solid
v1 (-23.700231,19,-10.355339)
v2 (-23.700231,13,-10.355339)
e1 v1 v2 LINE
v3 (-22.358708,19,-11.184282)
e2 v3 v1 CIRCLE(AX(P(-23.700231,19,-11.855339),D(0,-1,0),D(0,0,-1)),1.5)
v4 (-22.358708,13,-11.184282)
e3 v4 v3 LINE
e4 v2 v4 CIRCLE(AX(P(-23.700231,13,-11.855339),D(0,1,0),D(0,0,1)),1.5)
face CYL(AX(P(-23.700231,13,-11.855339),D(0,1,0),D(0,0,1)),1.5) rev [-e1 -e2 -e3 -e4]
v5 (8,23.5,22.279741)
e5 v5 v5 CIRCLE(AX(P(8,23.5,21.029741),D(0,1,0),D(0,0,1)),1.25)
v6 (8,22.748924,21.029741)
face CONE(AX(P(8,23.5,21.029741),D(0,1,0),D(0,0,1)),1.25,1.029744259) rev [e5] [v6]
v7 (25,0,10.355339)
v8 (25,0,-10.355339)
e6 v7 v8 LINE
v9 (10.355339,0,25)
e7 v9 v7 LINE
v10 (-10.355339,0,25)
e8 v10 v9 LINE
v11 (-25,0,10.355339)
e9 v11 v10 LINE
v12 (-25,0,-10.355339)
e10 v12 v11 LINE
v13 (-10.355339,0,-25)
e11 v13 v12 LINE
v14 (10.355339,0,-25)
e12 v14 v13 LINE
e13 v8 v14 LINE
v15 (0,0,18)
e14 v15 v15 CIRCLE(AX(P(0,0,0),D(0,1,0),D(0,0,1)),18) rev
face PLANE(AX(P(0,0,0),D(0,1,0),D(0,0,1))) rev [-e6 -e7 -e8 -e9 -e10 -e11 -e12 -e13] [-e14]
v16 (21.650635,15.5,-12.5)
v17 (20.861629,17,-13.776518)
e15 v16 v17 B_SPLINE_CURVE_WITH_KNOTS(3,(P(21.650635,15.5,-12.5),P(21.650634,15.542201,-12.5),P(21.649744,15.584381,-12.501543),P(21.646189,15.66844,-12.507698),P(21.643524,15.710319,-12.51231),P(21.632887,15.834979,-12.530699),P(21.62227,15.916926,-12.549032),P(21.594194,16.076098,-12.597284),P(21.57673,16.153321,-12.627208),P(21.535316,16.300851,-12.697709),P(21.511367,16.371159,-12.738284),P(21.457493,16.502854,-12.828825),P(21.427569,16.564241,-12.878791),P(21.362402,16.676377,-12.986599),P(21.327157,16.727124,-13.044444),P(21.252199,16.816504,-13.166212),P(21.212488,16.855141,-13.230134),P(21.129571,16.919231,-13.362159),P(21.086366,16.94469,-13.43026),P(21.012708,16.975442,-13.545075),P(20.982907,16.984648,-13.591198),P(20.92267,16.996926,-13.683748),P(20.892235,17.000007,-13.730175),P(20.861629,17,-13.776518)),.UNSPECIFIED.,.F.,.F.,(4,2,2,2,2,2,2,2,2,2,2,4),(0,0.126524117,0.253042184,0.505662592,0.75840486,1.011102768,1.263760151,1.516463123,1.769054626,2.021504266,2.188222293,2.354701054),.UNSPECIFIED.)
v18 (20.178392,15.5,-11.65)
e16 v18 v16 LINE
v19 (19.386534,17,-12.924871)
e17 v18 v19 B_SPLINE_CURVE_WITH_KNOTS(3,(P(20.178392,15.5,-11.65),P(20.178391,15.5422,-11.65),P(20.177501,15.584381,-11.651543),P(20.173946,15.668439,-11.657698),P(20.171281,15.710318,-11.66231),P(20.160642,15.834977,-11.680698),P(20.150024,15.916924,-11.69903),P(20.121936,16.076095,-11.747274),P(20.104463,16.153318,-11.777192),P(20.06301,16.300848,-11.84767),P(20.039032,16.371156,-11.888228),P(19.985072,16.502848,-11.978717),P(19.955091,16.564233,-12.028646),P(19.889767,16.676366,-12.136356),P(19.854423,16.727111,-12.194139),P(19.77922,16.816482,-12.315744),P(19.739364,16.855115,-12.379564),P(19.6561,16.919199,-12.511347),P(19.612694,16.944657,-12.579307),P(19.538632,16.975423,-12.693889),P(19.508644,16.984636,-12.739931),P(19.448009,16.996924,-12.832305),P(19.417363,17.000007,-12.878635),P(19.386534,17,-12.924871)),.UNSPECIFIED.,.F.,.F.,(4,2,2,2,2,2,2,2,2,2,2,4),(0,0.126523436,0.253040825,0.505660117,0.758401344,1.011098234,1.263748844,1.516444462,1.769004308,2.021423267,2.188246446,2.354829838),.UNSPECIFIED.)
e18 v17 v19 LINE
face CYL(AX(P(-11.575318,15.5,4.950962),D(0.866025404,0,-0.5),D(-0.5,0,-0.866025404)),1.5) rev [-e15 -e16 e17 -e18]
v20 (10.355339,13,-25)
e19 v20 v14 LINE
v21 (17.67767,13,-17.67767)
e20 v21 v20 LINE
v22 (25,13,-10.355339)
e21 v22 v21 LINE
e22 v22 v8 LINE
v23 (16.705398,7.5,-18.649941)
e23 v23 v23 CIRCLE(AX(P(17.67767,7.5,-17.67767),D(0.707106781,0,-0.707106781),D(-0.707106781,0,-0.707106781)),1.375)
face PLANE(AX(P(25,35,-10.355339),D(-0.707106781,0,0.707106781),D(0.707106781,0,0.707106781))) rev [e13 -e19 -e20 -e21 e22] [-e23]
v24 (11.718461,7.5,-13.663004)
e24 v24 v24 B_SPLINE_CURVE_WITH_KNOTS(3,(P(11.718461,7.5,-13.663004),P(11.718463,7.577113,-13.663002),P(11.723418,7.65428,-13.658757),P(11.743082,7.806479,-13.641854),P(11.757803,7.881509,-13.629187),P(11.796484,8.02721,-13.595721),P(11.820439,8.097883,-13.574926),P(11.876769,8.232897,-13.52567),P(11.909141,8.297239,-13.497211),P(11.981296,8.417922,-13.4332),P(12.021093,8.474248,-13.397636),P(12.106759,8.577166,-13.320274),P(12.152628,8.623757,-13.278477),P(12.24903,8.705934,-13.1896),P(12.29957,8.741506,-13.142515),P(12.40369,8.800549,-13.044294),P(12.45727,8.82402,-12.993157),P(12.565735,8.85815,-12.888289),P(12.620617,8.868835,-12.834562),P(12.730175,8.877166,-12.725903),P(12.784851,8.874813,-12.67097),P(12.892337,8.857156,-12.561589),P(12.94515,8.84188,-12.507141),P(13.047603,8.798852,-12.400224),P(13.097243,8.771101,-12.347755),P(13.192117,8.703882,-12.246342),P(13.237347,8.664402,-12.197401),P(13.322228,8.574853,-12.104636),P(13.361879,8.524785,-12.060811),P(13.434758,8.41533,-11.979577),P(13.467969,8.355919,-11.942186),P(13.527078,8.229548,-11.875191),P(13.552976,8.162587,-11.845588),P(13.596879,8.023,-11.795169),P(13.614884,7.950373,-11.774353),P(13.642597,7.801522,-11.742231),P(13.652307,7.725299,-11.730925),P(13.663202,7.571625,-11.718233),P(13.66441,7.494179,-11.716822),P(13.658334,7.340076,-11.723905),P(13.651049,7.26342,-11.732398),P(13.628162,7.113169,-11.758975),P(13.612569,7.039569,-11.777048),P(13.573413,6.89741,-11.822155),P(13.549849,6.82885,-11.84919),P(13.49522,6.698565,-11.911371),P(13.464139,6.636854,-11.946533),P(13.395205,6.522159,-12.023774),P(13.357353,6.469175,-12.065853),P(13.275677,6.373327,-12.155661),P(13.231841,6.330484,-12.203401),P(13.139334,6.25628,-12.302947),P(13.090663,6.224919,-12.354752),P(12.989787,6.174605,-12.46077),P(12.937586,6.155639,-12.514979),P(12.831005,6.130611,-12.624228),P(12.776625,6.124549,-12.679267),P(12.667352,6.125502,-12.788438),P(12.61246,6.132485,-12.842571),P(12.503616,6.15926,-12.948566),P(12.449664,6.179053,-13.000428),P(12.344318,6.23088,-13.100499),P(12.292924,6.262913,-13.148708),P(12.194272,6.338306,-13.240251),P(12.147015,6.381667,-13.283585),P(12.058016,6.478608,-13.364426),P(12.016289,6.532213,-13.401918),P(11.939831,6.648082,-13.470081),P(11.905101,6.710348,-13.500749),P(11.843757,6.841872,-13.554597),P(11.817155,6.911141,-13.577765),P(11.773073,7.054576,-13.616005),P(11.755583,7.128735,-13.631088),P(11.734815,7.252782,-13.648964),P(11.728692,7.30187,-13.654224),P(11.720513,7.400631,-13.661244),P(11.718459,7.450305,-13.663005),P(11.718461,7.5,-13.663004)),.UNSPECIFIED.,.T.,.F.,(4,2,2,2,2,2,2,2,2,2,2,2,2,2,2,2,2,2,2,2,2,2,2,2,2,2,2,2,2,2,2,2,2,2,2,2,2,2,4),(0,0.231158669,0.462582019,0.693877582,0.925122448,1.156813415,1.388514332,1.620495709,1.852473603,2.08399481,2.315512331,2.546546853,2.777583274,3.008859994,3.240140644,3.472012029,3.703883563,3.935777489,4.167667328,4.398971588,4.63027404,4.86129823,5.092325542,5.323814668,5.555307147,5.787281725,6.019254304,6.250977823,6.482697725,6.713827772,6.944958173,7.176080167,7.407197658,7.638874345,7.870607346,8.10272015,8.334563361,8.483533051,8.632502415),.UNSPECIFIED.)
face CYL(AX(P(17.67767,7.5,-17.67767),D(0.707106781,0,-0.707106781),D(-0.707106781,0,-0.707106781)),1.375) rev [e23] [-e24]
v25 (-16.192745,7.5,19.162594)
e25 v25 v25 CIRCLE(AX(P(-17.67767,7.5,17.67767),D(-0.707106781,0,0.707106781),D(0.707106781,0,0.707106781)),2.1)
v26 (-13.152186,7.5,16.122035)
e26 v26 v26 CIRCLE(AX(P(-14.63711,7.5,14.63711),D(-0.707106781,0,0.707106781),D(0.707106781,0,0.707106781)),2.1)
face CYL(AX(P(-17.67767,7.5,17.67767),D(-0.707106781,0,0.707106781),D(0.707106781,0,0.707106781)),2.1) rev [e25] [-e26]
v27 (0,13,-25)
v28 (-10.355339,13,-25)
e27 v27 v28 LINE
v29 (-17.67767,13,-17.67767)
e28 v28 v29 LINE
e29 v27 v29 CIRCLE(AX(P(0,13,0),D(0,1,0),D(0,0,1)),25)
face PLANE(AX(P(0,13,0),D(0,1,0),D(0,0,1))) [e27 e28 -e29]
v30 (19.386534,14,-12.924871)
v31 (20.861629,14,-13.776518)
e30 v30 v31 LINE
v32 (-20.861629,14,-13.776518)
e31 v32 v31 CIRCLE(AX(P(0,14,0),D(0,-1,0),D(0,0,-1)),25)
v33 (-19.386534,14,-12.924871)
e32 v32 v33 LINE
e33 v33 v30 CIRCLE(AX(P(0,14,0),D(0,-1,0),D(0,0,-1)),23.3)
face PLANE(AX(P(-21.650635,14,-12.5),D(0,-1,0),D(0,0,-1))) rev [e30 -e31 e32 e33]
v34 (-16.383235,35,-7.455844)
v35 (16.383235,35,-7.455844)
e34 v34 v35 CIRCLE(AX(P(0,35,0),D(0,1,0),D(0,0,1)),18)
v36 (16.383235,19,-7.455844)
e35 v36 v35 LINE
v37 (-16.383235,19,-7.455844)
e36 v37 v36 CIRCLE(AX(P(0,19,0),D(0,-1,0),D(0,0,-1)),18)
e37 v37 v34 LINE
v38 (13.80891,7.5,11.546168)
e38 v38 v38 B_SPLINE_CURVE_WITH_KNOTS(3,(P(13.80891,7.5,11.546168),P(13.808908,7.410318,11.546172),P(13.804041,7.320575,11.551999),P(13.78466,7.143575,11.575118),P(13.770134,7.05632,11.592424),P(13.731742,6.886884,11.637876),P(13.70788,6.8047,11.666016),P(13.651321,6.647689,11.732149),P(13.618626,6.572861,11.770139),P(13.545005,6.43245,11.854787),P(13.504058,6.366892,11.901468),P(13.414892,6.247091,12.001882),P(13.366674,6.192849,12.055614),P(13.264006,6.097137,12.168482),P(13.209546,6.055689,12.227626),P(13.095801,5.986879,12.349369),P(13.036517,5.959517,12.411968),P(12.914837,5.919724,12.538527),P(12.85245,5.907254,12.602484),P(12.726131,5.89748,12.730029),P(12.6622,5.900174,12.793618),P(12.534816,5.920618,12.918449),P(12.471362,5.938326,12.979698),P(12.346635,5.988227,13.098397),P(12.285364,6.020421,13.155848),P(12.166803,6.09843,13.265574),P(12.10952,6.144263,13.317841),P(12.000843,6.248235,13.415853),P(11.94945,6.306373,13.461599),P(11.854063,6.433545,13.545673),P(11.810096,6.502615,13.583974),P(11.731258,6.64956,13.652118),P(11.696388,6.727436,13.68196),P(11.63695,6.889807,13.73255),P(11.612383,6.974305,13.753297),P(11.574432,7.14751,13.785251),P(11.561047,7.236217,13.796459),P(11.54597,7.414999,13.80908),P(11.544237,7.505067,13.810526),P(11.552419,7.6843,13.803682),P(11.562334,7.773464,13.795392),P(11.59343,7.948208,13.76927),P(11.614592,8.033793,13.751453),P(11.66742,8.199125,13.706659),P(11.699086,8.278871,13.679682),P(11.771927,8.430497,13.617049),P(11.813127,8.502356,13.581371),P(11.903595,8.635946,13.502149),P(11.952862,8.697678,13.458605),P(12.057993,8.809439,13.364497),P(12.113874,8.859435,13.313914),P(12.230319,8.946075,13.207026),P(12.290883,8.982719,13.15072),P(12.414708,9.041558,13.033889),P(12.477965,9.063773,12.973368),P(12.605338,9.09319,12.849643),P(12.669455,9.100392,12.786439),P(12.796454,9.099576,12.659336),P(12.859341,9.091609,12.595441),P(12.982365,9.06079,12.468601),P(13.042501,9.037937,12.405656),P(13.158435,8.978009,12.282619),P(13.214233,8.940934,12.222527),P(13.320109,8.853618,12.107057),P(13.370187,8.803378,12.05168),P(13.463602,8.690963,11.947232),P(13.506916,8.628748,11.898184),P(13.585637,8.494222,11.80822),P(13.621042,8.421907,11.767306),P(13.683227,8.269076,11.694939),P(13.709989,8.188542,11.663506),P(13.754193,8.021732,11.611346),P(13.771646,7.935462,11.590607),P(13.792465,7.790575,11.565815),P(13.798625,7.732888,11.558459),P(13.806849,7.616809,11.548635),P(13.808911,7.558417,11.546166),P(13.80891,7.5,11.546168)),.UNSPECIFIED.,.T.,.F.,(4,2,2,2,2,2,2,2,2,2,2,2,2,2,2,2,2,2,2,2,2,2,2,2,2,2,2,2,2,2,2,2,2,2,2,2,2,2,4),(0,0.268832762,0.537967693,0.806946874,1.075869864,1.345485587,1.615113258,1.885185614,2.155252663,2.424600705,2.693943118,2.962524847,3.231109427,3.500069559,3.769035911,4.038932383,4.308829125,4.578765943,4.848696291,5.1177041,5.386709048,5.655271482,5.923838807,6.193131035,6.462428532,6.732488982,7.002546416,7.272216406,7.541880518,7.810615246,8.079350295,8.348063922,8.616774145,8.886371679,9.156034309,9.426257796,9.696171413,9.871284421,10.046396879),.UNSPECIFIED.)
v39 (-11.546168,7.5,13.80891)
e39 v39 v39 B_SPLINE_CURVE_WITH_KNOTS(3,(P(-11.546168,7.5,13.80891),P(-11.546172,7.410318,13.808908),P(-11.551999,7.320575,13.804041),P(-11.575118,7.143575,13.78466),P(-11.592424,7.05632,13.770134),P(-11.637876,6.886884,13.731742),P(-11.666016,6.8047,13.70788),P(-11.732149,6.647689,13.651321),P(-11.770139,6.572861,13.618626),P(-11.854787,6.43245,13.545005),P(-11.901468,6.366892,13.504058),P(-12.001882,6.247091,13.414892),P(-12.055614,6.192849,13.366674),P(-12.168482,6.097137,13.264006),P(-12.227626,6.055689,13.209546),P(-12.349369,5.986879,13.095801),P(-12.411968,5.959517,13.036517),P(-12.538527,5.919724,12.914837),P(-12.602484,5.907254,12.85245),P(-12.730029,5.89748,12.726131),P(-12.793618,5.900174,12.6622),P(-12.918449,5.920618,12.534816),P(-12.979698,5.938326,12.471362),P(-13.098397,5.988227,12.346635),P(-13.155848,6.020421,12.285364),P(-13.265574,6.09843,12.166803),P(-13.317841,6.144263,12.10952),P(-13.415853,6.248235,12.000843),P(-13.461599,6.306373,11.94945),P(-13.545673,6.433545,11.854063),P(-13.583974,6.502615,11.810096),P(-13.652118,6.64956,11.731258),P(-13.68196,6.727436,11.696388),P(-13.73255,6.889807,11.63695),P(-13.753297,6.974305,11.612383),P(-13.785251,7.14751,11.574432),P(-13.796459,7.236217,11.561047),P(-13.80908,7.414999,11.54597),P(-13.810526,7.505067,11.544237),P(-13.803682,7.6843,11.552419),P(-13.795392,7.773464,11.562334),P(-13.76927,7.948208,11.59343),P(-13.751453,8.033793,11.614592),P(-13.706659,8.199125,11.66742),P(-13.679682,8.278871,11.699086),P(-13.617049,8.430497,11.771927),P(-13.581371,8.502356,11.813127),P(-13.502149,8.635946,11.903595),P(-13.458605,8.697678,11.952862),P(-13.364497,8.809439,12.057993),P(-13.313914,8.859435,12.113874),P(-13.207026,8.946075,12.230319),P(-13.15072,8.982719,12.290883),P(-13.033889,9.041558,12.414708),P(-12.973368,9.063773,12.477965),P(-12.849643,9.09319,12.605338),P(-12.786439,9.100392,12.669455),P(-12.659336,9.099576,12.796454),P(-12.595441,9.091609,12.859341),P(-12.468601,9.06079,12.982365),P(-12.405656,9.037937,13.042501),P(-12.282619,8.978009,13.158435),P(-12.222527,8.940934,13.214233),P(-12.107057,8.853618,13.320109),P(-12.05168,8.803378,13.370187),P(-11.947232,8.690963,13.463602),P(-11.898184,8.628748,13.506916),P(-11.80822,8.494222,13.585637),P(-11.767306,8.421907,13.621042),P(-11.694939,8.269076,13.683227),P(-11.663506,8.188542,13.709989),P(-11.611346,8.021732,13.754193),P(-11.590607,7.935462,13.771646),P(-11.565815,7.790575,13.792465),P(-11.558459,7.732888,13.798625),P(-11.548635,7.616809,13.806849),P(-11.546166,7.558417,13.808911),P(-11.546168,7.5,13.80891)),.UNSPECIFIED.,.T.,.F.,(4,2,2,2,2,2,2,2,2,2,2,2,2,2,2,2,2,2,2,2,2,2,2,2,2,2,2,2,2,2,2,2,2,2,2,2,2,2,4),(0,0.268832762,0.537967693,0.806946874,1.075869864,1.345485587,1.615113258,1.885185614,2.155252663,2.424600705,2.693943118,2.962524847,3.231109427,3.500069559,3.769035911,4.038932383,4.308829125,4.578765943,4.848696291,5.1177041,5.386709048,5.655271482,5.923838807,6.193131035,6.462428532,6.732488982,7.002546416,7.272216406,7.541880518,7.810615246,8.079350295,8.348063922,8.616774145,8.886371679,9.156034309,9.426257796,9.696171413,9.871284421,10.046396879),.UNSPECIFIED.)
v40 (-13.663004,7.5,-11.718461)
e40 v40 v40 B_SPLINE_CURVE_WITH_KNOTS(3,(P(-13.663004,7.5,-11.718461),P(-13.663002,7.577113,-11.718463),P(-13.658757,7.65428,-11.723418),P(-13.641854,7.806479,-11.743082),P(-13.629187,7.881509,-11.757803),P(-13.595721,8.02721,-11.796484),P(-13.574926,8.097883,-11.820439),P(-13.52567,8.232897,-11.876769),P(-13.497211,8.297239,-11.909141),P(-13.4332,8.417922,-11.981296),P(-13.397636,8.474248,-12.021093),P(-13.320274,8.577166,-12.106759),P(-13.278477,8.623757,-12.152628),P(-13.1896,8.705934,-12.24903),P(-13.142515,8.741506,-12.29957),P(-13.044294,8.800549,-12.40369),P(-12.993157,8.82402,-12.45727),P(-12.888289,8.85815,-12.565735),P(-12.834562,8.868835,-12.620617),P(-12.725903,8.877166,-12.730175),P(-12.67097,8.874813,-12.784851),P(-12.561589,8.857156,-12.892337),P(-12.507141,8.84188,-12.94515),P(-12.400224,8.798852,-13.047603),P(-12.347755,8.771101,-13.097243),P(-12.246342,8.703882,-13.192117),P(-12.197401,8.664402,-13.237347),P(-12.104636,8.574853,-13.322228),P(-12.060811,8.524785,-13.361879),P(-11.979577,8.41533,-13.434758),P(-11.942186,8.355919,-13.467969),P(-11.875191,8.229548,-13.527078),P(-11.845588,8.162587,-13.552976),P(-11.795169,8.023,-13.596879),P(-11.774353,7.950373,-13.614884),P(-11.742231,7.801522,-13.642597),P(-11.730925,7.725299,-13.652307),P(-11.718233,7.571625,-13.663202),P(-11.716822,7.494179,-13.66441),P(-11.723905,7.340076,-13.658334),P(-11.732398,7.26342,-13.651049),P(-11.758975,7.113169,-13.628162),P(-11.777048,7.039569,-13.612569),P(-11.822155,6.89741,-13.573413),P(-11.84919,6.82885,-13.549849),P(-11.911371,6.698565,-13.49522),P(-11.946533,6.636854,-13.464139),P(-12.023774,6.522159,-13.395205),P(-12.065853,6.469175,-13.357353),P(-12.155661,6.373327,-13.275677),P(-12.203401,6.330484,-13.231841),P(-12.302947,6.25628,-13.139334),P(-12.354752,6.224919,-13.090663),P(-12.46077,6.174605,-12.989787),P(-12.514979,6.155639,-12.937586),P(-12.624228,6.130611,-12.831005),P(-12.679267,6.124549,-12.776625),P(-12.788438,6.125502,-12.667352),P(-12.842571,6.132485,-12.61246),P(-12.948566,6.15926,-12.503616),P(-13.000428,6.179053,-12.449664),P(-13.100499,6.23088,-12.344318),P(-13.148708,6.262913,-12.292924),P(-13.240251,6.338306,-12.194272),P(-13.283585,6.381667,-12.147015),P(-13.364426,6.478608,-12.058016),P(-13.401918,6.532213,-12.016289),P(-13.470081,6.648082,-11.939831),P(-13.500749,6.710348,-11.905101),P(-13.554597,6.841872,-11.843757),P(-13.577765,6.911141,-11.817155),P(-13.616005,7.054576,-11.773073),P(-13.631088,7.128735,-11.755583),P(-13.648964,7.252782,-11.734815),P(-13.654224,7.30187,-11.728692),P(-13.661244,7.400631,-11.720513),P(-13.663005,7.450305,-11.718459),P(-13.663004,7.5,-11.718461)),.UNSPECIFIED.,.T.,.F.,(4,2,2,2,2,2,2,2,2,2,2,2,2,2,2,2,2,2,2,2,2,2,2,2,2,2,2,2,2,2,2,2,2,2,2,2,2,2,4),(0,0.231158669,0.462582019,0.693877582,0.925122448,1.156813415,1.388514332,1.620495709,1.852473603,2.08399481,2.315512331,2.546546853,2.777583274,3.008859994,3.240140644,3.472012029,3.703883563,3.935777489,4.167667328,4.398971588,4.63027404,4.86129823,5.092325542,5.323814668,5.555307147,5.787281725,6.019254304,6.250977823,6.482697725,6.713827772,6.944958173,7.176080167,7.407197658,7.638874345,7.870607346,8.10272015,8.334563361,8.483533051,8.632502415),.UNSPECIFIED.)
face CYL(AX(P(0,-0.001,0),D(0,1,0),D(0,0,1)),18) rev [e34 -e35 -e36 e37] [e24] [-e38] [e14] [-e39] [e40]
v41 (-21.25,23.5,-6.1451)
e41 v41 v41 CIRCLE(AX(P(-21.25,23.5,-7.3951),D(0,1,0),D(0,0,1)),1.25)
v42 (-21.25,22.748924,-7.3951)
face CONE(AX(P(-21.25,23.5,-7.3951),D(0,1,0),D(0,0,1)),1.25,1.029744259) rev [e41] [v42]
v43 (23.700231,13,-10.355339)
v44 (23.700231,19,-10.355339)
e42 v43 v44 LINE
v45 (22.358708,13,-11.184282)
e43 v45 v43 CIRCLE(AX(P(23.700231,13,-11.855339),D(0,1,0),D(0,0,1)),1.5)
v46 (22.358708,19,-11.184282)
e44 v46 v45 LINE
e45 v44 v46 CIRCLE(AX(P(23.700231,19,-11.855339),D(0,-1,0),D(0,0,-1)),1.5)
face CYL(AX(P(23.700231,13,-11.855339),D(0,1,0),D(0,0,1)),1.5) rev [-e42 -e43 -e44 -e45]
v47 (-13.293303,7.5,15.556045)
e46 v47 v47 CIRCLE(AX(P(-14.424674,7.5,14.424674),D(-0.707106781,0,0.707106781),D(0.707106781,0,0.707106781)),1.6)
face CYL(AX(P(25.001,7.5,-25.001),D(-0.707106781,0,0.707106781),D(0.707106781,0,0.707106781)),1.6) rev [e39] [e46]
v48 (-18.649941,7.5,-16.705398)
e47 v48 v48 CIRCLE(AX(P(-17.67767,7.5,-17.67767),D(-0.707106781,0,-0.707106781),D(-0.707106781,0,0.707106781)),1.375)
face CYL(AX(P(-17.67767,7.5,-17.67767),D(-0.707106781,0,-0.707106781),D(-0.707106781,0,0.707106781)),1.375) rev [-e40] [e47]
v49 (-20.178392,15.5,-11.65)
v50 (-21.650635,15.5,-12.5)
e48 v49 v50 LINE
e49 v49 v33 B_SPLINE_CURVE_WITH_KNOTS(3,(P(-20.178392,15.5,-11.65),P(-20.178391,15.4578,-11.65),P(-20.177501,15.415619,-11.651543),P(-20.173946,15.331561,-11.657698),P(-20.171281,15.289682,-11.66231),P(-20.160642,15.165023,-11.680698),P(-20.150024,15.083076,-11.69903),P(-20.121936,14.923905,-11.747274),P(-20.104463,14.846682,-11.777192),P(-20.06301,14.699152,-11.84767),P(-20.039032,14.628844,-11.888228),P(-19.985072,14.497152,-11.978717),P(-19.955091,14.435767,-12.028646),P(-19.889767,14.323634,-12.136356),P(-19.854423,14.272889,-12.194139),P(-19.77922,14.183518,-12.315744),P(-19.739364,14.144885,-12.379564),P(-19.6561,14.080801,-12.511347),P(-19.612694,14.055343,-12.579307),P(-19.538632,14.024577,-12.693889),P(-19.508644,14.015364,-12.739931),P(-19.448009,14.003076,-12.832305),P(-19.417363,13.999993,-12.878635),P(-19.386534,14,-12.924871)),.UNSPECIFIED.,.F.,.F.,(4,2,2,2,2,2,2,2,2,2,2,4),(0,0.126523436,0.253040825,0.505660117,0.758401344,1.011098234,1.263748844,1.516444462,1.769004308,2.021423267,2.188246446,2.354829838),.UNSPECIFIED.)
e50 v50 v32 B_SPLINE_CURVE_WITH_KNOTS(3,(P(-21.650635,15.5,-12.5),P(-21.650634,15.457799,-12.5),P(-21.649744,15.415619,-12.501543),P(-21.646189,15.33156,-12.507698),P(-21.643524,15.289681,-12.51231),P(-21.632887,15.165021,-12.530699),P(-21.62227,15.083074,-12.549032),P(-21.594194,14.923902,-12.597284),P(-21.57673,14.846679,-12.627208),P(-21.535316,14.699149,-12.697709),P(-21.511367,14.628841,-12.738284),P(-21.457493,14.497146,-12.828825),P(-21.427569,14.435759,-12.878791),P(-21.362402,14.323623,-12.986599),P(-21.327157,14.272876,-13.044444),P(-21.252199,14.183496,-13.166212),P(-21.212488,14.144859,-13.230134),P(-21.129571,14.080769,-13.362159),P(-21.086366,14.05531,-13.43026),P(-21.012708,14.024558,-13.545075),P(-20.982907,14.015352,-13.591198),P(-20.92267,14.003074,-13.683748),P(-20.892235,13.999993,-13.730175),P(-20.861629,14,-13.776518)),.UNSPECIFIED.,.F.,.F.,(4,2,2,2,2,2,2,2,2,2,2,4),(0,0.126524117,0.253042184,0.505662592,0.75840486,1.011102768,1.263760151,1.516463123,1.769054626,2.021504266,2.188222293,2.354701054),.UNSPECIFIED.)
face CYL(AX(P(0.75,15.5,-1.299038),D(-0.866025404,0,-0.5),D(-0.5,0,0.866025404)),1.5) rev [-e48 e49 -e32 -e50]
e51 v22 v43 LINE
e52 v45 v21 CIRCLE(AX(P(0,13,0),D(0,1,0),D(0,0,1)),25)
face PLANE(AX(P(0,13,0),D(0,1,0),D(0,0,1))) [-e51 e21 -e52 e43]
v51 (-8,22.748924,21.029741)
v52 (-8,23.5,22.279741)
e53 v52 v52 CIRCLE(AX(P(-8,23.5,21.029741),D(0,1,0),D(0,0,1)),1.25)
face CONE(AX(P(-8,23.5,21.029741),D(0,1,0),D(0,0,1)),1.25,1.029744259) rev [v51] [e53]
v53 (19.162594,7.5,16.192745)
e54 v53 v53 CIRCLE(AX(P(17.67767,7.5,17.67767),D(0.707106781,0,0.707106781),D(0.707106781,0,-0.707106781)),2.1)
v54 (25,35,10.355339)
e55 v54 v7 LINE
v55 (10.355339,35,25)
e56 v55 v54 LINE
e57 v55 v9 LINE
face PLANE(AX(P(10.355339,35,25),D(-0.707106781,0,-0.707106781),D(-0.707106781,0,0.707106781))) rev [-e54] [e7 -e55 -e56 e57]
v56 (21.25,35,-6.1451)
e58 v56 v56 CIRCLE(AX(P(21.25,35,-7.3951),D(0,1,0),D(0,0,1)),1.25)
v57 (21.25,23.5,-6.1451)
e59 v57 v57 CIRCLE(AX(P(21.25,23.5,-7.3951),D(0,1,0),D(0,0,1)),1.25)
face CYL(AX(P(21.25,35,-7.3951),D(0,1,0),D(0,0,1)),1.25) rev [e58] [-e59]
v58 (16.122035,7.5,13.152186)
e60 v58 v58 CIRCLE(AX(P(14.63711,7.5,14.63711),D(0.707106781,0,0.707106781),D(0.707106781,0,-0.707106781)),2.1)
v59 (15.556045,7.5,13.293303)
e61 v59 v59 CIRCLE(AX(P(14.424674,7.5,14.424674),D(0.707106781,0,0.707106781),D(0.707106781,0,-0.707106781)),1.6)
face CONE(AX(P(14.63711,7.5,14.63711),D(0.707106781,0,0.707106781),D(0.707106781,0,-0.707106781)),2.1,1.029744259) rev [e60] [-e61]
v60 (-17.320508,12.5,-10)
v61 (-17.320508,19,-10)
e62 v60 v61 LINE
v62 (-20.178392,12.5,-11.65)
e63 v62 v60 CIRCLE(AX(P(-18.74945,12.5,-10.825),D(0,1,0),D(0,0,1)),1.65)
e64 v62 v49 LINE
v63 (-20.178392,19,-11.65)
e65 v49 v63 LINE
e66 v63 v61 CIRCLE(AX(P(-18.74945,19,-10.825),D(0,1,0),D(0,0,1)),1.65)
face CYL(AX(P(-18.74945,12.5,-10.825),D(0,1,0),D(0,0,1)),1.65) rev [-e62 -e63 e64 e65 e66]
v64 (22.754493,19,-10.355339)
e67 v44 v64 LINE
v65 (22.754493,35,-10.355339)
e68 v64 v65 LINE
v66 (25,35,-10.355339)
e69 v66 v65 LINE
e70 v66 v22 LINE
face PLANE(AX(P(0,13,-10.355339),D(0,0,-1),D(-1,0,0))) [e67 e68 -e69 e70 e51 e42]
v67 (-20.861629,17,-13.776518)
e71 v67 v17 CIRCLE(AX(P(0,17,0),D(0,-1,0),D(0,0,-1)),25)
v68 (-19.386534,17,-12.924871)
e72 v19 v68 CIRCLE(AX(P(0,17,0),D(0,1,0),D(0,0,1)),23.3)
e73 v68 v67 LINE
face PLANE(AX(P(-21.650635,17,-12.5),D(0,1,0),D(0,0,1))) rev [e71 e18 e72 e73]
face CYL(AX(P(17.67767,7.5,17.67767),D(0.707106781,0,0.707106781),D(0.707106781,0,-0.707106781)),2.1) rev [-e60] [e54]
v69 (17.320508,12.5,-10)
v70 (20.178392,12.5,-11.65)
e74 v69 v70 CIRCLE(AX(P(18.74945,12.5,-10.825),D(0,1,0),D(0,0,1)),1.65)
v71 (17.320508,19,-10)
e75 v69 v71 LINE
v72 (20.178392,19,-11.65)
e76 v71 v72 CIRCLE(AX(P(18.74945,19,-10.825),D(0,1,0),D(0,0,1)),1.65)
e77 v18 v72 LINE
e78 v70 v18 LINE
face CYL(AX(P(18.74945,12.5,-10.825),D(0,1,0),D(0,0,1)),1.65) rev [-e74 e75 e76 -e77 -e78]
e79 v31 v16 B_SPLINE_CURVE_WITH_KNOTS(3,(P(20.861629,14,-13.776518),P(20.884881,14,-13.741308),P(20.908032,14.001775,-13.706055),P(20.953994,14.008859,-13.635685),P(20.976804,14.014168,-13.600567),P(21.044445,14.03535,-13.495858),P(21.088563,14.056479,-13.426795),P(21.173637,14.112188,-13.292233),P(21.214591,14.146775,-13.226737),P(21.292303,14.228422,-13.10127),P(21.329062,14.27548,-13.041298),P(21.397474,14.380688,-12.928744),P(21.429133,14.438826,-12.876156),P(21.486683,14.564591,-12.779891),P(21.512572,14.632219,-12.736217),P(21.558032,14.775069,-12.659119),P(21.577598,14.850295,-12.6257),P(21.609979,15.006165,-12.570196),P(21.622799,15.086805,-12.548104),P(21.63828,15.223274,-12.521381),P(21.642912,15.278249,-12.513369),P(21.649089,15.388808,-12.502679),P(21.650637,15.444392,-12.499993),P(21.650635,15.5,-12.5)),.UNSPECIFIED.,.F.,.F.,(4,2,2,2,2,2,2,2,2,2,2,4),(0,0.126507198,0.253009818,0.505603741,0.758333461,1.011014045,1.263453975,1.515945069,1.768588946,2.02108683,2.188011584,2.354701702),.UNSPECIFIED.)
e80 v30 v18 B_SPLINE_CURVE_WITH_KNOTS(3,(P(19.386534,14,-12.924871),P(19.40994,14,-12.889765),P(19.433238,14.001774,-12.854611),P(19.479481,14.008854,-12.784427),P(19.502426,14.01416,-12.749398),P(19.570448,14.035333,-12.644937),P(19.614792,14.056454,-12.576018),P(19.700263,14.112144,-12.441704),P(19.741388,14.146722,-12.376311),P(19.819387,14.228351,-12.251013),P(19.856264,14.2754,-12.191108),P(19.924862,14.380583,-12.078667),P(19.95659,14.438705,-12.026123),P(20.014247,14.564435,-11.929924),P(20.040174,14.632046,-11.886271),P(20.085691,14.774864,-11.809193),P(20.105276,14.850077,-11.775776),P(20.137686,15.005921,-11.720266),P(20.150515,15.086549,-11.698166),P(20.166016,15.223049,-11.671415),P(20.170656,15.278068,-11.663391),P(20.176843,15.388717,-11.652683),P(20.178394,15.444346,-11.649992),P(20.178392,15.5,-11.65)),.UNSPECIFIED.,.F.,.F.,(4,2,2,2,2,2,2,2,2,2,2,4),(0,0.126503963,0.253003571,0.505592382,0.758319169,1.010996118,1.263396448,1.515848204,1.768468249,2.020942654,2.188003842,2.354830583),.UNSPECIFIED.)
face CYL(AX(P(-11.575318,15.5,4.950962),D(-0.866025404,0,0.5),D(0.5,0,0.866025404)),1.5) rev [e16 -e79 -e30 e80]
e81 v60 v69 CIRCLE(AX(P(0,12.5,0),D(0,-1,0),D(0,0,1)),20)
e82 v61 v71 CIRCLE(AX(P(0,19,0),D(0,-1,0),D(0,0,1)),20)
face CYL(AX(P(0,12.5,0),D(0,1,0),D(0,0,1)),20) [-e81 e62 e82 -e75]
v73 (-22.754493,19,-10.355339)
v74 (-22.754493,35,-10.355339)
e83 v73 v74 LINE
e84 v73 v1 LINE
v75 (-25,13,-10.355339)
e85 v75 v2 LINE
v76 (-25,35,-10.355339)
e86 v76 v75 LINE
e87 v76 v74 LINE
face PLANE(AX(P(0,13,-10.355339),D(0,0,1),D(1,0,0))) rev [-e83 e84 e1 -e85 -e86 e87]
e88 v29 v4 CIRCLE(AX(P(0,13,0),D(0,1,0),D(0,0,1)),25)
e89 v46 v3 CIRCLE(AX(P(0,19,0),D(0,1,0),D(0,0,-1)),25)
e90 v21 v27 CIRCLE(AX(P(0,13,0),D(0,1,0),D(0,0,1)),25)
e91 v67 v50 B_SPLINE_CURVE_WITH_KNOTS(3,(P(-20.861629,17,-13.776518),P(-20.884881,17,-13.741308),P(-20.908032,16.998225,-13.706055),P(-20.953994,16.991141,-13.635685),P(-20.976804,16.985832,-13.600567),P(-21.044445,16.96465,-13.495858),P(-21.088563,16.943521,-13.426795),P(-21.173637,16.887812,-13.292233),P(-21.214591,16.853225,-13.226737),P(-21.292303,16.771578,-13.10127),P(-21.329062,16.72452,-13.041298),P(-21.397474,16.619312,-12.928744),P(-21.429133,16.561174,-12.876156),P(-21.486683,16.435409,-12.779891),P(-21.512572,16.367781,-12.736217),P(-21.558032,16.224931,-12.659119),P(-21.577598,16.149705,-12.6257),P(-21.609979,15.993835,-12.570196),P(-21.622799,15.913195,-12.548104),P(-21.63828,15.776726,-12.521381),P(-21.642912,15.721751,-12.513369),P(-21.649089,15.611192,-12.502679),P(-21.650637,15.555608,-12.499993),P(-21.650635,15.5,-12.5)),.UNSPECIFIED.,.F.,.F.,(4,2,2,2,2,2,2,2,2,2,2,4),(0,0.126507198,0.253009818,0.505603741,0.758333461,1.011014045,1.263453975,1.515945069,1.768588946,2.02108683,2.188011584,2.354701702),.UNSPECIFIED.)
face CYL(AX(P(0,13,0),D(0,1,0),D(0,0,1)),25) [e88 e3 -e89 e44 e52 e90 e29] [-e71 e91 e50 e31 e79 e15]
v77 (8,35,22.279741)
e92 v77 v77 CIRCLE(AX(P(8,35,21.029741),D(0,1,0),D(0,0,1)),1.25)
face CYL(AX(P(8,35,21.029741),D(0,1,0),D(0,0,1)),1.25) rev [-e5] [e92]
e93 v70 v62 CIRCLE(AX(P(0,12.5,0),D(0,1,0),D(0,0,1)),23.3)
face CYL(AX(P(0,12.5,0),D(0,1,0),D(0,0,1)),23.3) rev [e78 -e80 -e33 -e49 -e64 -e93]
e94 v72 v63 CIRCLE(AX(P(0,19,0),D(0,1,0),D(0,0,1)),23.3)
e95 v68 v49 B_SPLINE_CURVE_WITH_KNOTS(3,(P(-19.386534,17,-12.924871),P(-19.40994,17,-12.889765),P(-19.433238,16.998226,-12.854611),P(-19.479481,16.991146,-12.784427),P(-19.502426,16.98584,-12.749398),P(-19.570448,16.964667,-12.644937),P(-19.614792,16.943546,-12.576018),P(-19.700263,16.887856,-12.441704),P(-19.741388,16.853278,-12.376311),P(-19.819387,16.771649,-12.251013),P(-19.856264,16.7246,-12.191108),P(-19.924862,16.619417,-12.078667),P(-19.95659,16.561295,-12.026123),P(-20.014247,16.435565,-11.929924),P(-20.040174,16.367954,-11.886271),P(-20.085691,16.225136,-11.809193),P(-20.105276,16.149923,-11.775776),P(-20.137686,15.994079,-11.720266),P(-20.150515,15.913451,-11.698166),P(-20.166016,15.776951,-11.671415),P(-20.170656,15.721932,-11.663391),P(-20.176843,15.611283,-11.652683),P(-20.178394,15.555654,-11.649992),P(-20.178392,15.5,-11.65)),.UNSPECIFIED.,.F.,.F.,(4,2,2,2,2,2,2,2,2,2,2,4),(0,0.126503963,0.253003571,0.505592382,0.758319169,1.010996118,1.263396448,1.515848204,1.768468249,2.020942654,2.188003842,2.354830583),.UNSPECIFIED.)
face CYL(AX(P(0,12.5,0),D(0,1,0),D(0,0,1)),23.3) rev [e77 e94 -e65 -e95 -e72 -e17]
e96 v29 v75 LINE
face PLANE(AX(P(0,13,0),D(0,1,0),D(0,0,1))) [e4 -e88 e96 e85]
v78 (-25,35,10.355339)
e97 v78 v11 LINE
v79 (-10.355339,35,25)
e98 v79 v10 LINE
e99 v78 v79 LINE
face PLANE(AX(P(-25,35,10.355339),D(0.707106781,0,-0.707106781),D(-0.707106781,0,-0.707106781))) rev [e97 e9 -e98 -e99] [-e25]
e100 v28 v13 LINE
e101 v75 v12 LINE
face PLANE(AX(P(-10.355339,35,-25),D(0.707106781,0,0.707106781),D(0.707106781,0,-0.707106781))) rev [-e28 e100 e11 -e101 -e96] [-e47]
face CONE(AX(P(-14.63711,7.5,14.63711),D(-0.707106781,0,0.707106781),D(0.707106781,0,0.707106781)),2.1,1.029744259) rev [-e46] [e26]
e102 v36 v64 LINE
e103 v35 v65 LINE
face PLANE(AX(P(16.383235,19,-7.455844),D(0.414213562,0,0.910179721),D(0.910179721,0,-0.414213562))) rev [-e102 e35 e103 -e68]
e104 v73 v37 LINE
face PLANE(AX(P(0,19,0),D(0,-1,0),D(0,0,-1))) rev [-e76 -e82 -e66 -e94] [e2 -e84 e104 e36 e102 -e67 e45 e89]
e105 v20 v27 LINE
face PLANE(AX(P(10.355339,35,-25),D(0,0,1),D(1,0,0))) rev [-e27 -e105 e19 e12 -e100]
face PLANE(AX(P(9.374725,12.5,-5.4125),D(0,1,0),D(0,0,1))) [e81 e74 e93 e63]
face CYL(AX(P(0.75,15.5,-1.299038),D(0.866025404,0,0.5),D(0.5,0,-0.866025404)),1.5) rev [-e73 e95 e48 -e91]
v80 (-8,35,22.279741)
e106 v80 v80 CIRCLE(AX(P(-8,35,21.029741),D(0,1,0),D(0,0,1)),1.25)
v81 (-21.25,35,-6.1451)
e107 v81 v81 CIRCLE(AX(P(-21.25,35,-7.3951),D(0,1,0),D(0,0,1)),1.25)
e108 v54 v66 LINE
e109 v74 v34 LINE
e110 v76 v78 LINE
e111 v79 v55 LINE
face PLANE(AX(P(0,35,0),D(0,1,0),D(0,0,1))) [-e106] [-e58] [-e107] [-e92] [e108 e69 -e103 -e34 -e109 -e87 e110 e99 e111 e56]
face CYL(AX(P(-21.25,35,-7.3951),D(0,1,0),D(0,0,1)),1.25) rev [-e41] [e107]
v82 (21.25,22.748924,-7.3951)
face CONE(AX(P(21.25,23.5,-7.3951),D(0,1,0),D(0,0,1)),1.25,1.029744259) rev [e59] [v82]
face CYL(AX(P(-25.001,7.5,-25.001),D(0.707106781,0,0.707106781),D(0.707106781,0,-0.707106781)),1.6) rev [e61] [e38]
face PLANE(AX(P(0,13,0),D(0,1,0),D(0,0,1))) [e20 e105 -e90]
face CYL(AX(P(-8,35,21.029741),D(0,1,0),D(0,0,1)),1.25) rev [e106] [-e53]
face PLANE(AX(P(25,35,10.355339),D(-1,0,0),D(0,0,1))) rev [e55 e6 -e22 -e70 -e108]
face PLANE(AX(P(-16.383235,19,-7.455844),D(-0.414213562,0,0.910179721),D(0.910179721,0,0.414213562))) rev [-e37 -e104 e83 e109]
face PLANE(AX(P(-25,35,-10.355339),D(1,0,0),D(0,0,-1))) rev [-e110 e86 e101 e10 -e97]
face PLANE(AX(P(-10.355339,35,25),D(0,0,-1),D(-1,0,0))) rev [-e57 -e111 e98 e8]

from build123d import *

# Parameters (mm, degrees)
BOSS_EXTRUDE1_DEPTH         = 35
CUT_EXTRUDE1_REACH          = 51.749
SKETCH2_R                   = 18
CUT_EXTRUDE2_DEPTH          = 22
CUT_EXTRUDE3_DEPTH          = 16
SKETCH5_W                   = 4.5
SKETCH5_H                   = 3
CUT_REVOLVE1_ANGLE          = 120
FILLET2_R                   = 1.5
CUT_EXTRUDE7_DEPTH          = 6.5
M3X0_25_TAPPED_HOLE1_REACH  = 71.769
M3X0_25_TAPPED_HOLE1_BORE_R = 1.375
M3X0_25_TAPPED_HOLE2_REACH  = 71.769
M3X0_25_TAPPED_HOLE2_BORE_R = 1.375
CUT_EXTRUDE8_REACH          = 71.769
CUT_EXTRUDE8_END_RADIUS     = 18
SKETCH15_R                  = 1.6
CUT_EXTRUDE9_REACH          = 71.769
CUT_EXTRUDE9_END_RADIUS     = 18
SKETCH16_R                  = 1.6
M5_TAPPED_HOLE3_D           = 4.2
M5_TAPPED_HOLE3_DEPTH       = 4.3
M5_TAPPED_HOLE3_TIP         = 1.2618073
M5_TAPPED_HOLE4_D           = 4.2
M5_TAPPED_HOLE4_DEPTH       = 4.3
M5_TAPPED_HOLE4_TIP         = 1.2618073
M3_TAPPED_HOLE1_D           = 2.5
M3_TAPPED_HOLE1_DEPTH       = 11.5
M3_TAPPED_HOLE1_TIP         = 0.751075774
FILLET3_R                   = 1.5


with BuildPart() as part:
    # Sketch1 → Boss-Extrude1 (new body)
    with BuildSketch(Plane(origin=(0, 0, 0), x_dir=(1, 0, 0), z_dir=(0, 1, 0))):
        Polygon((10.355339059, 25), (-10.355339059, 25), (-25, 10.355339059), (-25, -10.355339059), (-10.355339059, -25), (10.355339059, -25), (25, -10.355339059), (25, 10.355339059), align=None)
    extrude(amount=BOSS_EXTRUDE1_DEPTH)

    # Sketch2 → Cut-Extrude1 (cut, up to next)
    with BuildSketch(Plane(origin=(0, 35, 0), x_dir=(1, 0, 0), z_dir=(0, 1, 0)), mode=Mode.PRIVATE) as cut_extrude1_sk1:
        with Locations(Location((0, 0, 0), (0, 0, 270))):
            Circle(SKETCH2_R)
    cut_extrude1_tool1 = extrude(cut_extrude1_sk1.sketch, amount=-CUT_EXTRUDE1_REACH, mode=Mode.PRIVATE) & part.part
    add(cut_extrude1_tool1.solids().sort_by_distance((0, 35, 0))[0], mode=Mode.SUBTRACT)

    # Sketch3 → Cut-Extrude2 (cut)
    with BuildSketch(Plane(origin=(0, 35, 0), x_dir=(1, 0, 0), z_dir=(0, 1, 0))):
        with BuildLine():
            Line((-10.355339059, 25), (-17.677669284, 17.677669776))
            ThreePointArc((-17.677669284, 17.677669776), (-9.567085631, 23.096988387), (3.8e-08, 25))
            Line((3.8e-08, 25), (-10.355339059, 25))
        make_face()
        with BuildLine():
            Line((-17.677669284, 17.677669776), (-25, 10.355339059))
            Line((-25, 10.355339059), (-22.754493028, 10.355339059))
            ThreePointArc((-22.754493028, 10.355339059), (-20.544928062, 14.244505289), (-17.677669284, 17.677669776))
        make_face()
        with BuildLine():
            Line((10.355339059, 25), (3.8e-08, 25))
            ThreePointArc((3.8e-08, 25), (9.56708591, 23.096988271), (17.677669657, 17.677669402))
            Line((17.677669657, 17.677669402), (10.355339059, 25))
        make_face()
        with BuildLine():
            Line((25, 10.355339059), (17.677669657, 17.677669402))
            ThreePointArc((17.677669657, 17.677669402), (20.544928213, 14.244505072), (22.754493028, 10.355339059))
            Line((22.754493028, 10.355339059), (25, 10.355339059))
        make_face()
    extrude(amount=-CUT_EXTRUDE2_DEPTH, mode=Mode.SUBTRACT)

    # Sketch4 → Cut-Extrude3 (cut)
    with BuildSketch(Plane(origin=(0, 35, 0), x_dir=(1, 0, 0), z_dir=(0, 1, 0))):
        with BuildLine():
            Line((-16.38323498, 7.455844123), (-22.754493028, 10.355339059))
            ThreePointArc((-22.754493028, 10.355339059), (0, 25), (22.754493028, 10.355339059))
            Line((22.754493028, 10.355339059), (16.38323498, 7.455844123))
            ThreePointArc((16.38323498, 7.455844123), (0, 18), (-16.38323498, 7.455844123))
        make_face()
    extrude(amount=-CUT_EXTRUDE3_DEPTH, mode=Mode.SUBTRACT)

    # Sketch5 → Cut-Revolve1 (revolve, symmetric, cut)
    with BuildSketch(Plane(origin=(0, 0, 0), x_dir=(0, 0, -1), z_dir=(1, 0, 0))) as cut_revolve1_sk:
        with Locations((22.75, 15.5)):
            Rectangle(SKETCH5_W, SKETCH5_H)
    revolve(axis=Axis((0, 0, 0), (0, 1, 0)), revolution_arc=CUT_REVOLVE1_ANGLE / 2, mode=Mode.SUBTRACT)
    revolve(cut_revolve1_sk.sketch, axis=Axis((0, 0, 0), (0, -1, 0)), revolution_arc=CUT_REVOLVE1_ANGLE / 2, mode=Mode.SUBTRACT)

    # Fillet2
    fillet2_edges = [part.edges().sort_by_distance(p)[0] for p in [
        (19.702077936, 14, -11.375),
        (19.702077936, 17, -11.375),
        (-19.702077936, 17, -11.375),
        (-19.702077936, 14, -11.375),
    ]]
    fillet(fillet2_edges, radius=FILLET2_R - 0.0001)  # a hair under: the kernel refuses the full size

    # Sketch9 → Cut-Extrude7 (cut)
    with BuildSketch(Plane(origin=(0, 19, 0), x_dir=(1, 0, 0), z_dir=(0, 1, 0))):
        with BuildLine():
            ThreePointArc((20.178391908, 11.65), (0, 23.3), (-20.178391908, 11.65))
            ThreePointArc((-20.178391908, 11.65), (-19.574449992, 9.396058084), (-17.320508076, 10))
            ThreePointArc((-17.320508076, 10), (0, 20), (17.320508076, 10))
            ThreePointArc((17.320508076, 10), (19.574449992, 9.396058084), (20.178391908, 11.65))
        make_face()
    extrude(amount=-CUT_EXTRUDE7_DEPTH, mode=Mode.SUBTRACT)

    # M3x0.25 Tapped Hole1 bore → M3x0.25 Tapped Hole1 (cut, up to next)
    with BuildSketch(Plane(origin=(-17.67766953, 0, -17.67766953), x_dir=(-0.7071067811865472, 0, 0.7071067811865479), z_dir=(-0.7071067811865479, 0, -0.7071067811865472)), mode=Mode.PRIVATE) as m3x0_25_tapped_hole1_sk1:
        with Locations((0, 7.5)):
            Circle(M3X0_25_TAPPED_HOLE1_BORE_R)
    m3x0_25_tapped_hole1_tool1 = extrude(m3x0_25_tapped_hole1_sk1.sketch, amount=-M3X0_25_TAPPED_HOLE1_REACH, mode=Mode.PRIVATE) & part.part
    add(m3x0_25_tapped_hole1_tool1.solids().sort_by_distance((-17.67767, 7.5, -17.67767))[0], mode=Mode.SUBTRACT)

    # M3x0.25 Tapped Hole2 bore → M3x0.25 Tapped Hole2 (cut, up to next)
    with BuildSketch(Plane(origin=(17.67766953, 0, -17.67766953), x_dir=(-0.7071067811865475, 0, -0.7071067811865477), z_dir=(0.7071067811865477, 0, -0.7071067811865475)), mode=Mode.PRIVATE) as m3x0_25_tapped_hole2_sk1:
        with Locations((0, 7.5)):
            Circle(M3X0_25_TAPPED_HOLE2_BORE_R)
    m3x0_25_tapped_hole2_tool1 = extrude(m3x0_25_tapped_hole2_sk1.sketch, amount=-M3X0_25_TAPPED_HOLE2_REACH, mode=Mode.PRIVATE) & part.part
    add(m3x0_25_tapped_hole2_tool1.solids().sort_by_distance((17.67767, 7.5, -17.67767))[0], mode=Mode.SUBTRACT)

    # Cut-Extrude8: up to this cylinder (the profile starts outside it)
    cut_extrude8_end = Plane(origin=(0, 7.5, 0), z_dir=(0, 1, 0)) * Cylinder(CUT_EXTRUDE8_END_RADIUS, 180.538, mode=Mode.PRIVATE)
    # Sketch15 → Cut-Extrude8 (cut, up to the surface)
    with BuildSketch(Plane(origin=(17.67766953, 0, 17.67766953), x_dir=(0.7071067811865472, 0, -0.7071067811865479), z_dir=(0.7071067811865479, 0, 0.7071067811865472)), mode=Mode.PRIVATE) as cut_extrude8_sk1:
        with Locations((0, 7.5)):
            Circle(SKETCH15_R)
    cut_extrude8_tool1 = extrude(cut_extrude8_sk1.sketch, amount=-CUT_EXTRUDE8_REACH, mode=Mode.PRIVATE) - cut_extrude8_end
    add(cut_extrude8_tool1.solids().sort_by_distance((17.67767, 7.5, 17.67767))[0], mode=Mode.SUBTRACT)

    # Cut-Extrude9: up to this cylinder (the profile starts outside it)
    cut_extrude9_end = Plane(origin=(0, 7.5, 0), z_dir=(0, 1, 0)) * Cylinder(CUT_EXTRUDE9_END_RADIUS, 180.538, mode=Mode.PRIVATE)
    # Sketch16 → Cut-Extrude9 (cut, up to the surface)
    with BuildSketch(Plane(origin=(-17.67766953, 0, 17.67766953), x_dir=(0.7071067811865477, 0, 0.7071067811865475), z_dir=(-0.7071067811865475, 0, 0.7071067811865477)), mode=Mode.PRIVATE) as cut_extrude9_sk1:
        with Locations((0, 7.5)):
            Circle(SKETCH16_R)
    cut_extrude9_tool1 = extrude(cut_extrude9_sk1.sketch, amount=-CUT_EXTRUDE9_REACH, mode=Mode.PRIVATE) - cut_extrude9_end
    add(cut_extrude9_tool1.solids().sort_by_distance((-17.67767, 7.5, 17.67767))[0], mode=Mode.SUBTRACT)

    # M5 Tapped Hole3
    with Locations(Plane(origin=(-17.67766953, 0, 17.67766953), x_dir=(0.7071067811865477, 0, 0.7071067811865475), z_dir=(-0.7071067811865475, 0, 0.7071067811865477))):
        with Locations((0, 7.5)):
            Hole(M5_TAPPED_HOLE3_D / 2, depth=M5_TAPPED_HOLE3_DEPTH)
            with Locations((0, 0, -(M5_TAPPED_HOLE3_DEPTH + M5_TAPPED_HOLE3_TIP / 2))):  # 118° drill point
                Cone(0, M5_TAPPED_HOLE3_D / 2, M5_TAPPED_HOLE3_TIP, mode=Mode.SUBTRACT)

    # M5 Tapped Hole4
    with Locations(Plane(origin=(17.67766953, 0, 17.67766953), x_dir=(0.7071067811865472, 0, -0.7071067811865479), z_dir=(0.7071067811865479, 0, 0.7071067811865472))):
        with Locations((0, 7.5)):
            Hole(M5_TAPPED_HOLE4_D / 2, depth=M5_TAPPED_HOLE4_DEPTH)
            with Locations((0, 0, -(M5_TAPPED_HOLE4_DEPTH + M5_TAPPED_HOLE4_TIP / 2))):  # 118° drill point
                Cone(0, M5_TAPPED_HOLE4_D / 2, M5_TAPPED_HOLE4_TIP, mode=Mode.SUBTRACT)

    # M3 Tapped Hole1
    with Locations(Plane(origin=(0, 35, 0), x_dir=(1, 0, 0), z_dir=(0, 1, 0))):
        with Locations((-21.25, 7.395099729), (21.25, 7.395099729), (-8, -21.029740845), (8, -21.029740845)):
            Hole(M3_TAPPED_HOLE1_D / 2, depth=M3_TAPPED_HOLE1_DEPTH)
            with Locations((0, 0, -(M3_TAPPED_HOLE1_DEPTH + M3_TAPPED_HOLE1_TIP / 2))):  # 118° drill point
                Cone(0, M3_TAPPED_HOLE1_D / 2, M3_TAPPED_HOLE1_TIP, mode=Mode.SUBTRACT)

    # Fillet3
    fillet3_edges = [part.edges().sort_by_distance(p)[0] for p in [
        (22.754493028, 16, -10.355339059),
        (-22.754493028, 16, -10.355339059),
    ]]
    fillet(fillet3_edges, radius=FILLET3_R)


solid = part.part
